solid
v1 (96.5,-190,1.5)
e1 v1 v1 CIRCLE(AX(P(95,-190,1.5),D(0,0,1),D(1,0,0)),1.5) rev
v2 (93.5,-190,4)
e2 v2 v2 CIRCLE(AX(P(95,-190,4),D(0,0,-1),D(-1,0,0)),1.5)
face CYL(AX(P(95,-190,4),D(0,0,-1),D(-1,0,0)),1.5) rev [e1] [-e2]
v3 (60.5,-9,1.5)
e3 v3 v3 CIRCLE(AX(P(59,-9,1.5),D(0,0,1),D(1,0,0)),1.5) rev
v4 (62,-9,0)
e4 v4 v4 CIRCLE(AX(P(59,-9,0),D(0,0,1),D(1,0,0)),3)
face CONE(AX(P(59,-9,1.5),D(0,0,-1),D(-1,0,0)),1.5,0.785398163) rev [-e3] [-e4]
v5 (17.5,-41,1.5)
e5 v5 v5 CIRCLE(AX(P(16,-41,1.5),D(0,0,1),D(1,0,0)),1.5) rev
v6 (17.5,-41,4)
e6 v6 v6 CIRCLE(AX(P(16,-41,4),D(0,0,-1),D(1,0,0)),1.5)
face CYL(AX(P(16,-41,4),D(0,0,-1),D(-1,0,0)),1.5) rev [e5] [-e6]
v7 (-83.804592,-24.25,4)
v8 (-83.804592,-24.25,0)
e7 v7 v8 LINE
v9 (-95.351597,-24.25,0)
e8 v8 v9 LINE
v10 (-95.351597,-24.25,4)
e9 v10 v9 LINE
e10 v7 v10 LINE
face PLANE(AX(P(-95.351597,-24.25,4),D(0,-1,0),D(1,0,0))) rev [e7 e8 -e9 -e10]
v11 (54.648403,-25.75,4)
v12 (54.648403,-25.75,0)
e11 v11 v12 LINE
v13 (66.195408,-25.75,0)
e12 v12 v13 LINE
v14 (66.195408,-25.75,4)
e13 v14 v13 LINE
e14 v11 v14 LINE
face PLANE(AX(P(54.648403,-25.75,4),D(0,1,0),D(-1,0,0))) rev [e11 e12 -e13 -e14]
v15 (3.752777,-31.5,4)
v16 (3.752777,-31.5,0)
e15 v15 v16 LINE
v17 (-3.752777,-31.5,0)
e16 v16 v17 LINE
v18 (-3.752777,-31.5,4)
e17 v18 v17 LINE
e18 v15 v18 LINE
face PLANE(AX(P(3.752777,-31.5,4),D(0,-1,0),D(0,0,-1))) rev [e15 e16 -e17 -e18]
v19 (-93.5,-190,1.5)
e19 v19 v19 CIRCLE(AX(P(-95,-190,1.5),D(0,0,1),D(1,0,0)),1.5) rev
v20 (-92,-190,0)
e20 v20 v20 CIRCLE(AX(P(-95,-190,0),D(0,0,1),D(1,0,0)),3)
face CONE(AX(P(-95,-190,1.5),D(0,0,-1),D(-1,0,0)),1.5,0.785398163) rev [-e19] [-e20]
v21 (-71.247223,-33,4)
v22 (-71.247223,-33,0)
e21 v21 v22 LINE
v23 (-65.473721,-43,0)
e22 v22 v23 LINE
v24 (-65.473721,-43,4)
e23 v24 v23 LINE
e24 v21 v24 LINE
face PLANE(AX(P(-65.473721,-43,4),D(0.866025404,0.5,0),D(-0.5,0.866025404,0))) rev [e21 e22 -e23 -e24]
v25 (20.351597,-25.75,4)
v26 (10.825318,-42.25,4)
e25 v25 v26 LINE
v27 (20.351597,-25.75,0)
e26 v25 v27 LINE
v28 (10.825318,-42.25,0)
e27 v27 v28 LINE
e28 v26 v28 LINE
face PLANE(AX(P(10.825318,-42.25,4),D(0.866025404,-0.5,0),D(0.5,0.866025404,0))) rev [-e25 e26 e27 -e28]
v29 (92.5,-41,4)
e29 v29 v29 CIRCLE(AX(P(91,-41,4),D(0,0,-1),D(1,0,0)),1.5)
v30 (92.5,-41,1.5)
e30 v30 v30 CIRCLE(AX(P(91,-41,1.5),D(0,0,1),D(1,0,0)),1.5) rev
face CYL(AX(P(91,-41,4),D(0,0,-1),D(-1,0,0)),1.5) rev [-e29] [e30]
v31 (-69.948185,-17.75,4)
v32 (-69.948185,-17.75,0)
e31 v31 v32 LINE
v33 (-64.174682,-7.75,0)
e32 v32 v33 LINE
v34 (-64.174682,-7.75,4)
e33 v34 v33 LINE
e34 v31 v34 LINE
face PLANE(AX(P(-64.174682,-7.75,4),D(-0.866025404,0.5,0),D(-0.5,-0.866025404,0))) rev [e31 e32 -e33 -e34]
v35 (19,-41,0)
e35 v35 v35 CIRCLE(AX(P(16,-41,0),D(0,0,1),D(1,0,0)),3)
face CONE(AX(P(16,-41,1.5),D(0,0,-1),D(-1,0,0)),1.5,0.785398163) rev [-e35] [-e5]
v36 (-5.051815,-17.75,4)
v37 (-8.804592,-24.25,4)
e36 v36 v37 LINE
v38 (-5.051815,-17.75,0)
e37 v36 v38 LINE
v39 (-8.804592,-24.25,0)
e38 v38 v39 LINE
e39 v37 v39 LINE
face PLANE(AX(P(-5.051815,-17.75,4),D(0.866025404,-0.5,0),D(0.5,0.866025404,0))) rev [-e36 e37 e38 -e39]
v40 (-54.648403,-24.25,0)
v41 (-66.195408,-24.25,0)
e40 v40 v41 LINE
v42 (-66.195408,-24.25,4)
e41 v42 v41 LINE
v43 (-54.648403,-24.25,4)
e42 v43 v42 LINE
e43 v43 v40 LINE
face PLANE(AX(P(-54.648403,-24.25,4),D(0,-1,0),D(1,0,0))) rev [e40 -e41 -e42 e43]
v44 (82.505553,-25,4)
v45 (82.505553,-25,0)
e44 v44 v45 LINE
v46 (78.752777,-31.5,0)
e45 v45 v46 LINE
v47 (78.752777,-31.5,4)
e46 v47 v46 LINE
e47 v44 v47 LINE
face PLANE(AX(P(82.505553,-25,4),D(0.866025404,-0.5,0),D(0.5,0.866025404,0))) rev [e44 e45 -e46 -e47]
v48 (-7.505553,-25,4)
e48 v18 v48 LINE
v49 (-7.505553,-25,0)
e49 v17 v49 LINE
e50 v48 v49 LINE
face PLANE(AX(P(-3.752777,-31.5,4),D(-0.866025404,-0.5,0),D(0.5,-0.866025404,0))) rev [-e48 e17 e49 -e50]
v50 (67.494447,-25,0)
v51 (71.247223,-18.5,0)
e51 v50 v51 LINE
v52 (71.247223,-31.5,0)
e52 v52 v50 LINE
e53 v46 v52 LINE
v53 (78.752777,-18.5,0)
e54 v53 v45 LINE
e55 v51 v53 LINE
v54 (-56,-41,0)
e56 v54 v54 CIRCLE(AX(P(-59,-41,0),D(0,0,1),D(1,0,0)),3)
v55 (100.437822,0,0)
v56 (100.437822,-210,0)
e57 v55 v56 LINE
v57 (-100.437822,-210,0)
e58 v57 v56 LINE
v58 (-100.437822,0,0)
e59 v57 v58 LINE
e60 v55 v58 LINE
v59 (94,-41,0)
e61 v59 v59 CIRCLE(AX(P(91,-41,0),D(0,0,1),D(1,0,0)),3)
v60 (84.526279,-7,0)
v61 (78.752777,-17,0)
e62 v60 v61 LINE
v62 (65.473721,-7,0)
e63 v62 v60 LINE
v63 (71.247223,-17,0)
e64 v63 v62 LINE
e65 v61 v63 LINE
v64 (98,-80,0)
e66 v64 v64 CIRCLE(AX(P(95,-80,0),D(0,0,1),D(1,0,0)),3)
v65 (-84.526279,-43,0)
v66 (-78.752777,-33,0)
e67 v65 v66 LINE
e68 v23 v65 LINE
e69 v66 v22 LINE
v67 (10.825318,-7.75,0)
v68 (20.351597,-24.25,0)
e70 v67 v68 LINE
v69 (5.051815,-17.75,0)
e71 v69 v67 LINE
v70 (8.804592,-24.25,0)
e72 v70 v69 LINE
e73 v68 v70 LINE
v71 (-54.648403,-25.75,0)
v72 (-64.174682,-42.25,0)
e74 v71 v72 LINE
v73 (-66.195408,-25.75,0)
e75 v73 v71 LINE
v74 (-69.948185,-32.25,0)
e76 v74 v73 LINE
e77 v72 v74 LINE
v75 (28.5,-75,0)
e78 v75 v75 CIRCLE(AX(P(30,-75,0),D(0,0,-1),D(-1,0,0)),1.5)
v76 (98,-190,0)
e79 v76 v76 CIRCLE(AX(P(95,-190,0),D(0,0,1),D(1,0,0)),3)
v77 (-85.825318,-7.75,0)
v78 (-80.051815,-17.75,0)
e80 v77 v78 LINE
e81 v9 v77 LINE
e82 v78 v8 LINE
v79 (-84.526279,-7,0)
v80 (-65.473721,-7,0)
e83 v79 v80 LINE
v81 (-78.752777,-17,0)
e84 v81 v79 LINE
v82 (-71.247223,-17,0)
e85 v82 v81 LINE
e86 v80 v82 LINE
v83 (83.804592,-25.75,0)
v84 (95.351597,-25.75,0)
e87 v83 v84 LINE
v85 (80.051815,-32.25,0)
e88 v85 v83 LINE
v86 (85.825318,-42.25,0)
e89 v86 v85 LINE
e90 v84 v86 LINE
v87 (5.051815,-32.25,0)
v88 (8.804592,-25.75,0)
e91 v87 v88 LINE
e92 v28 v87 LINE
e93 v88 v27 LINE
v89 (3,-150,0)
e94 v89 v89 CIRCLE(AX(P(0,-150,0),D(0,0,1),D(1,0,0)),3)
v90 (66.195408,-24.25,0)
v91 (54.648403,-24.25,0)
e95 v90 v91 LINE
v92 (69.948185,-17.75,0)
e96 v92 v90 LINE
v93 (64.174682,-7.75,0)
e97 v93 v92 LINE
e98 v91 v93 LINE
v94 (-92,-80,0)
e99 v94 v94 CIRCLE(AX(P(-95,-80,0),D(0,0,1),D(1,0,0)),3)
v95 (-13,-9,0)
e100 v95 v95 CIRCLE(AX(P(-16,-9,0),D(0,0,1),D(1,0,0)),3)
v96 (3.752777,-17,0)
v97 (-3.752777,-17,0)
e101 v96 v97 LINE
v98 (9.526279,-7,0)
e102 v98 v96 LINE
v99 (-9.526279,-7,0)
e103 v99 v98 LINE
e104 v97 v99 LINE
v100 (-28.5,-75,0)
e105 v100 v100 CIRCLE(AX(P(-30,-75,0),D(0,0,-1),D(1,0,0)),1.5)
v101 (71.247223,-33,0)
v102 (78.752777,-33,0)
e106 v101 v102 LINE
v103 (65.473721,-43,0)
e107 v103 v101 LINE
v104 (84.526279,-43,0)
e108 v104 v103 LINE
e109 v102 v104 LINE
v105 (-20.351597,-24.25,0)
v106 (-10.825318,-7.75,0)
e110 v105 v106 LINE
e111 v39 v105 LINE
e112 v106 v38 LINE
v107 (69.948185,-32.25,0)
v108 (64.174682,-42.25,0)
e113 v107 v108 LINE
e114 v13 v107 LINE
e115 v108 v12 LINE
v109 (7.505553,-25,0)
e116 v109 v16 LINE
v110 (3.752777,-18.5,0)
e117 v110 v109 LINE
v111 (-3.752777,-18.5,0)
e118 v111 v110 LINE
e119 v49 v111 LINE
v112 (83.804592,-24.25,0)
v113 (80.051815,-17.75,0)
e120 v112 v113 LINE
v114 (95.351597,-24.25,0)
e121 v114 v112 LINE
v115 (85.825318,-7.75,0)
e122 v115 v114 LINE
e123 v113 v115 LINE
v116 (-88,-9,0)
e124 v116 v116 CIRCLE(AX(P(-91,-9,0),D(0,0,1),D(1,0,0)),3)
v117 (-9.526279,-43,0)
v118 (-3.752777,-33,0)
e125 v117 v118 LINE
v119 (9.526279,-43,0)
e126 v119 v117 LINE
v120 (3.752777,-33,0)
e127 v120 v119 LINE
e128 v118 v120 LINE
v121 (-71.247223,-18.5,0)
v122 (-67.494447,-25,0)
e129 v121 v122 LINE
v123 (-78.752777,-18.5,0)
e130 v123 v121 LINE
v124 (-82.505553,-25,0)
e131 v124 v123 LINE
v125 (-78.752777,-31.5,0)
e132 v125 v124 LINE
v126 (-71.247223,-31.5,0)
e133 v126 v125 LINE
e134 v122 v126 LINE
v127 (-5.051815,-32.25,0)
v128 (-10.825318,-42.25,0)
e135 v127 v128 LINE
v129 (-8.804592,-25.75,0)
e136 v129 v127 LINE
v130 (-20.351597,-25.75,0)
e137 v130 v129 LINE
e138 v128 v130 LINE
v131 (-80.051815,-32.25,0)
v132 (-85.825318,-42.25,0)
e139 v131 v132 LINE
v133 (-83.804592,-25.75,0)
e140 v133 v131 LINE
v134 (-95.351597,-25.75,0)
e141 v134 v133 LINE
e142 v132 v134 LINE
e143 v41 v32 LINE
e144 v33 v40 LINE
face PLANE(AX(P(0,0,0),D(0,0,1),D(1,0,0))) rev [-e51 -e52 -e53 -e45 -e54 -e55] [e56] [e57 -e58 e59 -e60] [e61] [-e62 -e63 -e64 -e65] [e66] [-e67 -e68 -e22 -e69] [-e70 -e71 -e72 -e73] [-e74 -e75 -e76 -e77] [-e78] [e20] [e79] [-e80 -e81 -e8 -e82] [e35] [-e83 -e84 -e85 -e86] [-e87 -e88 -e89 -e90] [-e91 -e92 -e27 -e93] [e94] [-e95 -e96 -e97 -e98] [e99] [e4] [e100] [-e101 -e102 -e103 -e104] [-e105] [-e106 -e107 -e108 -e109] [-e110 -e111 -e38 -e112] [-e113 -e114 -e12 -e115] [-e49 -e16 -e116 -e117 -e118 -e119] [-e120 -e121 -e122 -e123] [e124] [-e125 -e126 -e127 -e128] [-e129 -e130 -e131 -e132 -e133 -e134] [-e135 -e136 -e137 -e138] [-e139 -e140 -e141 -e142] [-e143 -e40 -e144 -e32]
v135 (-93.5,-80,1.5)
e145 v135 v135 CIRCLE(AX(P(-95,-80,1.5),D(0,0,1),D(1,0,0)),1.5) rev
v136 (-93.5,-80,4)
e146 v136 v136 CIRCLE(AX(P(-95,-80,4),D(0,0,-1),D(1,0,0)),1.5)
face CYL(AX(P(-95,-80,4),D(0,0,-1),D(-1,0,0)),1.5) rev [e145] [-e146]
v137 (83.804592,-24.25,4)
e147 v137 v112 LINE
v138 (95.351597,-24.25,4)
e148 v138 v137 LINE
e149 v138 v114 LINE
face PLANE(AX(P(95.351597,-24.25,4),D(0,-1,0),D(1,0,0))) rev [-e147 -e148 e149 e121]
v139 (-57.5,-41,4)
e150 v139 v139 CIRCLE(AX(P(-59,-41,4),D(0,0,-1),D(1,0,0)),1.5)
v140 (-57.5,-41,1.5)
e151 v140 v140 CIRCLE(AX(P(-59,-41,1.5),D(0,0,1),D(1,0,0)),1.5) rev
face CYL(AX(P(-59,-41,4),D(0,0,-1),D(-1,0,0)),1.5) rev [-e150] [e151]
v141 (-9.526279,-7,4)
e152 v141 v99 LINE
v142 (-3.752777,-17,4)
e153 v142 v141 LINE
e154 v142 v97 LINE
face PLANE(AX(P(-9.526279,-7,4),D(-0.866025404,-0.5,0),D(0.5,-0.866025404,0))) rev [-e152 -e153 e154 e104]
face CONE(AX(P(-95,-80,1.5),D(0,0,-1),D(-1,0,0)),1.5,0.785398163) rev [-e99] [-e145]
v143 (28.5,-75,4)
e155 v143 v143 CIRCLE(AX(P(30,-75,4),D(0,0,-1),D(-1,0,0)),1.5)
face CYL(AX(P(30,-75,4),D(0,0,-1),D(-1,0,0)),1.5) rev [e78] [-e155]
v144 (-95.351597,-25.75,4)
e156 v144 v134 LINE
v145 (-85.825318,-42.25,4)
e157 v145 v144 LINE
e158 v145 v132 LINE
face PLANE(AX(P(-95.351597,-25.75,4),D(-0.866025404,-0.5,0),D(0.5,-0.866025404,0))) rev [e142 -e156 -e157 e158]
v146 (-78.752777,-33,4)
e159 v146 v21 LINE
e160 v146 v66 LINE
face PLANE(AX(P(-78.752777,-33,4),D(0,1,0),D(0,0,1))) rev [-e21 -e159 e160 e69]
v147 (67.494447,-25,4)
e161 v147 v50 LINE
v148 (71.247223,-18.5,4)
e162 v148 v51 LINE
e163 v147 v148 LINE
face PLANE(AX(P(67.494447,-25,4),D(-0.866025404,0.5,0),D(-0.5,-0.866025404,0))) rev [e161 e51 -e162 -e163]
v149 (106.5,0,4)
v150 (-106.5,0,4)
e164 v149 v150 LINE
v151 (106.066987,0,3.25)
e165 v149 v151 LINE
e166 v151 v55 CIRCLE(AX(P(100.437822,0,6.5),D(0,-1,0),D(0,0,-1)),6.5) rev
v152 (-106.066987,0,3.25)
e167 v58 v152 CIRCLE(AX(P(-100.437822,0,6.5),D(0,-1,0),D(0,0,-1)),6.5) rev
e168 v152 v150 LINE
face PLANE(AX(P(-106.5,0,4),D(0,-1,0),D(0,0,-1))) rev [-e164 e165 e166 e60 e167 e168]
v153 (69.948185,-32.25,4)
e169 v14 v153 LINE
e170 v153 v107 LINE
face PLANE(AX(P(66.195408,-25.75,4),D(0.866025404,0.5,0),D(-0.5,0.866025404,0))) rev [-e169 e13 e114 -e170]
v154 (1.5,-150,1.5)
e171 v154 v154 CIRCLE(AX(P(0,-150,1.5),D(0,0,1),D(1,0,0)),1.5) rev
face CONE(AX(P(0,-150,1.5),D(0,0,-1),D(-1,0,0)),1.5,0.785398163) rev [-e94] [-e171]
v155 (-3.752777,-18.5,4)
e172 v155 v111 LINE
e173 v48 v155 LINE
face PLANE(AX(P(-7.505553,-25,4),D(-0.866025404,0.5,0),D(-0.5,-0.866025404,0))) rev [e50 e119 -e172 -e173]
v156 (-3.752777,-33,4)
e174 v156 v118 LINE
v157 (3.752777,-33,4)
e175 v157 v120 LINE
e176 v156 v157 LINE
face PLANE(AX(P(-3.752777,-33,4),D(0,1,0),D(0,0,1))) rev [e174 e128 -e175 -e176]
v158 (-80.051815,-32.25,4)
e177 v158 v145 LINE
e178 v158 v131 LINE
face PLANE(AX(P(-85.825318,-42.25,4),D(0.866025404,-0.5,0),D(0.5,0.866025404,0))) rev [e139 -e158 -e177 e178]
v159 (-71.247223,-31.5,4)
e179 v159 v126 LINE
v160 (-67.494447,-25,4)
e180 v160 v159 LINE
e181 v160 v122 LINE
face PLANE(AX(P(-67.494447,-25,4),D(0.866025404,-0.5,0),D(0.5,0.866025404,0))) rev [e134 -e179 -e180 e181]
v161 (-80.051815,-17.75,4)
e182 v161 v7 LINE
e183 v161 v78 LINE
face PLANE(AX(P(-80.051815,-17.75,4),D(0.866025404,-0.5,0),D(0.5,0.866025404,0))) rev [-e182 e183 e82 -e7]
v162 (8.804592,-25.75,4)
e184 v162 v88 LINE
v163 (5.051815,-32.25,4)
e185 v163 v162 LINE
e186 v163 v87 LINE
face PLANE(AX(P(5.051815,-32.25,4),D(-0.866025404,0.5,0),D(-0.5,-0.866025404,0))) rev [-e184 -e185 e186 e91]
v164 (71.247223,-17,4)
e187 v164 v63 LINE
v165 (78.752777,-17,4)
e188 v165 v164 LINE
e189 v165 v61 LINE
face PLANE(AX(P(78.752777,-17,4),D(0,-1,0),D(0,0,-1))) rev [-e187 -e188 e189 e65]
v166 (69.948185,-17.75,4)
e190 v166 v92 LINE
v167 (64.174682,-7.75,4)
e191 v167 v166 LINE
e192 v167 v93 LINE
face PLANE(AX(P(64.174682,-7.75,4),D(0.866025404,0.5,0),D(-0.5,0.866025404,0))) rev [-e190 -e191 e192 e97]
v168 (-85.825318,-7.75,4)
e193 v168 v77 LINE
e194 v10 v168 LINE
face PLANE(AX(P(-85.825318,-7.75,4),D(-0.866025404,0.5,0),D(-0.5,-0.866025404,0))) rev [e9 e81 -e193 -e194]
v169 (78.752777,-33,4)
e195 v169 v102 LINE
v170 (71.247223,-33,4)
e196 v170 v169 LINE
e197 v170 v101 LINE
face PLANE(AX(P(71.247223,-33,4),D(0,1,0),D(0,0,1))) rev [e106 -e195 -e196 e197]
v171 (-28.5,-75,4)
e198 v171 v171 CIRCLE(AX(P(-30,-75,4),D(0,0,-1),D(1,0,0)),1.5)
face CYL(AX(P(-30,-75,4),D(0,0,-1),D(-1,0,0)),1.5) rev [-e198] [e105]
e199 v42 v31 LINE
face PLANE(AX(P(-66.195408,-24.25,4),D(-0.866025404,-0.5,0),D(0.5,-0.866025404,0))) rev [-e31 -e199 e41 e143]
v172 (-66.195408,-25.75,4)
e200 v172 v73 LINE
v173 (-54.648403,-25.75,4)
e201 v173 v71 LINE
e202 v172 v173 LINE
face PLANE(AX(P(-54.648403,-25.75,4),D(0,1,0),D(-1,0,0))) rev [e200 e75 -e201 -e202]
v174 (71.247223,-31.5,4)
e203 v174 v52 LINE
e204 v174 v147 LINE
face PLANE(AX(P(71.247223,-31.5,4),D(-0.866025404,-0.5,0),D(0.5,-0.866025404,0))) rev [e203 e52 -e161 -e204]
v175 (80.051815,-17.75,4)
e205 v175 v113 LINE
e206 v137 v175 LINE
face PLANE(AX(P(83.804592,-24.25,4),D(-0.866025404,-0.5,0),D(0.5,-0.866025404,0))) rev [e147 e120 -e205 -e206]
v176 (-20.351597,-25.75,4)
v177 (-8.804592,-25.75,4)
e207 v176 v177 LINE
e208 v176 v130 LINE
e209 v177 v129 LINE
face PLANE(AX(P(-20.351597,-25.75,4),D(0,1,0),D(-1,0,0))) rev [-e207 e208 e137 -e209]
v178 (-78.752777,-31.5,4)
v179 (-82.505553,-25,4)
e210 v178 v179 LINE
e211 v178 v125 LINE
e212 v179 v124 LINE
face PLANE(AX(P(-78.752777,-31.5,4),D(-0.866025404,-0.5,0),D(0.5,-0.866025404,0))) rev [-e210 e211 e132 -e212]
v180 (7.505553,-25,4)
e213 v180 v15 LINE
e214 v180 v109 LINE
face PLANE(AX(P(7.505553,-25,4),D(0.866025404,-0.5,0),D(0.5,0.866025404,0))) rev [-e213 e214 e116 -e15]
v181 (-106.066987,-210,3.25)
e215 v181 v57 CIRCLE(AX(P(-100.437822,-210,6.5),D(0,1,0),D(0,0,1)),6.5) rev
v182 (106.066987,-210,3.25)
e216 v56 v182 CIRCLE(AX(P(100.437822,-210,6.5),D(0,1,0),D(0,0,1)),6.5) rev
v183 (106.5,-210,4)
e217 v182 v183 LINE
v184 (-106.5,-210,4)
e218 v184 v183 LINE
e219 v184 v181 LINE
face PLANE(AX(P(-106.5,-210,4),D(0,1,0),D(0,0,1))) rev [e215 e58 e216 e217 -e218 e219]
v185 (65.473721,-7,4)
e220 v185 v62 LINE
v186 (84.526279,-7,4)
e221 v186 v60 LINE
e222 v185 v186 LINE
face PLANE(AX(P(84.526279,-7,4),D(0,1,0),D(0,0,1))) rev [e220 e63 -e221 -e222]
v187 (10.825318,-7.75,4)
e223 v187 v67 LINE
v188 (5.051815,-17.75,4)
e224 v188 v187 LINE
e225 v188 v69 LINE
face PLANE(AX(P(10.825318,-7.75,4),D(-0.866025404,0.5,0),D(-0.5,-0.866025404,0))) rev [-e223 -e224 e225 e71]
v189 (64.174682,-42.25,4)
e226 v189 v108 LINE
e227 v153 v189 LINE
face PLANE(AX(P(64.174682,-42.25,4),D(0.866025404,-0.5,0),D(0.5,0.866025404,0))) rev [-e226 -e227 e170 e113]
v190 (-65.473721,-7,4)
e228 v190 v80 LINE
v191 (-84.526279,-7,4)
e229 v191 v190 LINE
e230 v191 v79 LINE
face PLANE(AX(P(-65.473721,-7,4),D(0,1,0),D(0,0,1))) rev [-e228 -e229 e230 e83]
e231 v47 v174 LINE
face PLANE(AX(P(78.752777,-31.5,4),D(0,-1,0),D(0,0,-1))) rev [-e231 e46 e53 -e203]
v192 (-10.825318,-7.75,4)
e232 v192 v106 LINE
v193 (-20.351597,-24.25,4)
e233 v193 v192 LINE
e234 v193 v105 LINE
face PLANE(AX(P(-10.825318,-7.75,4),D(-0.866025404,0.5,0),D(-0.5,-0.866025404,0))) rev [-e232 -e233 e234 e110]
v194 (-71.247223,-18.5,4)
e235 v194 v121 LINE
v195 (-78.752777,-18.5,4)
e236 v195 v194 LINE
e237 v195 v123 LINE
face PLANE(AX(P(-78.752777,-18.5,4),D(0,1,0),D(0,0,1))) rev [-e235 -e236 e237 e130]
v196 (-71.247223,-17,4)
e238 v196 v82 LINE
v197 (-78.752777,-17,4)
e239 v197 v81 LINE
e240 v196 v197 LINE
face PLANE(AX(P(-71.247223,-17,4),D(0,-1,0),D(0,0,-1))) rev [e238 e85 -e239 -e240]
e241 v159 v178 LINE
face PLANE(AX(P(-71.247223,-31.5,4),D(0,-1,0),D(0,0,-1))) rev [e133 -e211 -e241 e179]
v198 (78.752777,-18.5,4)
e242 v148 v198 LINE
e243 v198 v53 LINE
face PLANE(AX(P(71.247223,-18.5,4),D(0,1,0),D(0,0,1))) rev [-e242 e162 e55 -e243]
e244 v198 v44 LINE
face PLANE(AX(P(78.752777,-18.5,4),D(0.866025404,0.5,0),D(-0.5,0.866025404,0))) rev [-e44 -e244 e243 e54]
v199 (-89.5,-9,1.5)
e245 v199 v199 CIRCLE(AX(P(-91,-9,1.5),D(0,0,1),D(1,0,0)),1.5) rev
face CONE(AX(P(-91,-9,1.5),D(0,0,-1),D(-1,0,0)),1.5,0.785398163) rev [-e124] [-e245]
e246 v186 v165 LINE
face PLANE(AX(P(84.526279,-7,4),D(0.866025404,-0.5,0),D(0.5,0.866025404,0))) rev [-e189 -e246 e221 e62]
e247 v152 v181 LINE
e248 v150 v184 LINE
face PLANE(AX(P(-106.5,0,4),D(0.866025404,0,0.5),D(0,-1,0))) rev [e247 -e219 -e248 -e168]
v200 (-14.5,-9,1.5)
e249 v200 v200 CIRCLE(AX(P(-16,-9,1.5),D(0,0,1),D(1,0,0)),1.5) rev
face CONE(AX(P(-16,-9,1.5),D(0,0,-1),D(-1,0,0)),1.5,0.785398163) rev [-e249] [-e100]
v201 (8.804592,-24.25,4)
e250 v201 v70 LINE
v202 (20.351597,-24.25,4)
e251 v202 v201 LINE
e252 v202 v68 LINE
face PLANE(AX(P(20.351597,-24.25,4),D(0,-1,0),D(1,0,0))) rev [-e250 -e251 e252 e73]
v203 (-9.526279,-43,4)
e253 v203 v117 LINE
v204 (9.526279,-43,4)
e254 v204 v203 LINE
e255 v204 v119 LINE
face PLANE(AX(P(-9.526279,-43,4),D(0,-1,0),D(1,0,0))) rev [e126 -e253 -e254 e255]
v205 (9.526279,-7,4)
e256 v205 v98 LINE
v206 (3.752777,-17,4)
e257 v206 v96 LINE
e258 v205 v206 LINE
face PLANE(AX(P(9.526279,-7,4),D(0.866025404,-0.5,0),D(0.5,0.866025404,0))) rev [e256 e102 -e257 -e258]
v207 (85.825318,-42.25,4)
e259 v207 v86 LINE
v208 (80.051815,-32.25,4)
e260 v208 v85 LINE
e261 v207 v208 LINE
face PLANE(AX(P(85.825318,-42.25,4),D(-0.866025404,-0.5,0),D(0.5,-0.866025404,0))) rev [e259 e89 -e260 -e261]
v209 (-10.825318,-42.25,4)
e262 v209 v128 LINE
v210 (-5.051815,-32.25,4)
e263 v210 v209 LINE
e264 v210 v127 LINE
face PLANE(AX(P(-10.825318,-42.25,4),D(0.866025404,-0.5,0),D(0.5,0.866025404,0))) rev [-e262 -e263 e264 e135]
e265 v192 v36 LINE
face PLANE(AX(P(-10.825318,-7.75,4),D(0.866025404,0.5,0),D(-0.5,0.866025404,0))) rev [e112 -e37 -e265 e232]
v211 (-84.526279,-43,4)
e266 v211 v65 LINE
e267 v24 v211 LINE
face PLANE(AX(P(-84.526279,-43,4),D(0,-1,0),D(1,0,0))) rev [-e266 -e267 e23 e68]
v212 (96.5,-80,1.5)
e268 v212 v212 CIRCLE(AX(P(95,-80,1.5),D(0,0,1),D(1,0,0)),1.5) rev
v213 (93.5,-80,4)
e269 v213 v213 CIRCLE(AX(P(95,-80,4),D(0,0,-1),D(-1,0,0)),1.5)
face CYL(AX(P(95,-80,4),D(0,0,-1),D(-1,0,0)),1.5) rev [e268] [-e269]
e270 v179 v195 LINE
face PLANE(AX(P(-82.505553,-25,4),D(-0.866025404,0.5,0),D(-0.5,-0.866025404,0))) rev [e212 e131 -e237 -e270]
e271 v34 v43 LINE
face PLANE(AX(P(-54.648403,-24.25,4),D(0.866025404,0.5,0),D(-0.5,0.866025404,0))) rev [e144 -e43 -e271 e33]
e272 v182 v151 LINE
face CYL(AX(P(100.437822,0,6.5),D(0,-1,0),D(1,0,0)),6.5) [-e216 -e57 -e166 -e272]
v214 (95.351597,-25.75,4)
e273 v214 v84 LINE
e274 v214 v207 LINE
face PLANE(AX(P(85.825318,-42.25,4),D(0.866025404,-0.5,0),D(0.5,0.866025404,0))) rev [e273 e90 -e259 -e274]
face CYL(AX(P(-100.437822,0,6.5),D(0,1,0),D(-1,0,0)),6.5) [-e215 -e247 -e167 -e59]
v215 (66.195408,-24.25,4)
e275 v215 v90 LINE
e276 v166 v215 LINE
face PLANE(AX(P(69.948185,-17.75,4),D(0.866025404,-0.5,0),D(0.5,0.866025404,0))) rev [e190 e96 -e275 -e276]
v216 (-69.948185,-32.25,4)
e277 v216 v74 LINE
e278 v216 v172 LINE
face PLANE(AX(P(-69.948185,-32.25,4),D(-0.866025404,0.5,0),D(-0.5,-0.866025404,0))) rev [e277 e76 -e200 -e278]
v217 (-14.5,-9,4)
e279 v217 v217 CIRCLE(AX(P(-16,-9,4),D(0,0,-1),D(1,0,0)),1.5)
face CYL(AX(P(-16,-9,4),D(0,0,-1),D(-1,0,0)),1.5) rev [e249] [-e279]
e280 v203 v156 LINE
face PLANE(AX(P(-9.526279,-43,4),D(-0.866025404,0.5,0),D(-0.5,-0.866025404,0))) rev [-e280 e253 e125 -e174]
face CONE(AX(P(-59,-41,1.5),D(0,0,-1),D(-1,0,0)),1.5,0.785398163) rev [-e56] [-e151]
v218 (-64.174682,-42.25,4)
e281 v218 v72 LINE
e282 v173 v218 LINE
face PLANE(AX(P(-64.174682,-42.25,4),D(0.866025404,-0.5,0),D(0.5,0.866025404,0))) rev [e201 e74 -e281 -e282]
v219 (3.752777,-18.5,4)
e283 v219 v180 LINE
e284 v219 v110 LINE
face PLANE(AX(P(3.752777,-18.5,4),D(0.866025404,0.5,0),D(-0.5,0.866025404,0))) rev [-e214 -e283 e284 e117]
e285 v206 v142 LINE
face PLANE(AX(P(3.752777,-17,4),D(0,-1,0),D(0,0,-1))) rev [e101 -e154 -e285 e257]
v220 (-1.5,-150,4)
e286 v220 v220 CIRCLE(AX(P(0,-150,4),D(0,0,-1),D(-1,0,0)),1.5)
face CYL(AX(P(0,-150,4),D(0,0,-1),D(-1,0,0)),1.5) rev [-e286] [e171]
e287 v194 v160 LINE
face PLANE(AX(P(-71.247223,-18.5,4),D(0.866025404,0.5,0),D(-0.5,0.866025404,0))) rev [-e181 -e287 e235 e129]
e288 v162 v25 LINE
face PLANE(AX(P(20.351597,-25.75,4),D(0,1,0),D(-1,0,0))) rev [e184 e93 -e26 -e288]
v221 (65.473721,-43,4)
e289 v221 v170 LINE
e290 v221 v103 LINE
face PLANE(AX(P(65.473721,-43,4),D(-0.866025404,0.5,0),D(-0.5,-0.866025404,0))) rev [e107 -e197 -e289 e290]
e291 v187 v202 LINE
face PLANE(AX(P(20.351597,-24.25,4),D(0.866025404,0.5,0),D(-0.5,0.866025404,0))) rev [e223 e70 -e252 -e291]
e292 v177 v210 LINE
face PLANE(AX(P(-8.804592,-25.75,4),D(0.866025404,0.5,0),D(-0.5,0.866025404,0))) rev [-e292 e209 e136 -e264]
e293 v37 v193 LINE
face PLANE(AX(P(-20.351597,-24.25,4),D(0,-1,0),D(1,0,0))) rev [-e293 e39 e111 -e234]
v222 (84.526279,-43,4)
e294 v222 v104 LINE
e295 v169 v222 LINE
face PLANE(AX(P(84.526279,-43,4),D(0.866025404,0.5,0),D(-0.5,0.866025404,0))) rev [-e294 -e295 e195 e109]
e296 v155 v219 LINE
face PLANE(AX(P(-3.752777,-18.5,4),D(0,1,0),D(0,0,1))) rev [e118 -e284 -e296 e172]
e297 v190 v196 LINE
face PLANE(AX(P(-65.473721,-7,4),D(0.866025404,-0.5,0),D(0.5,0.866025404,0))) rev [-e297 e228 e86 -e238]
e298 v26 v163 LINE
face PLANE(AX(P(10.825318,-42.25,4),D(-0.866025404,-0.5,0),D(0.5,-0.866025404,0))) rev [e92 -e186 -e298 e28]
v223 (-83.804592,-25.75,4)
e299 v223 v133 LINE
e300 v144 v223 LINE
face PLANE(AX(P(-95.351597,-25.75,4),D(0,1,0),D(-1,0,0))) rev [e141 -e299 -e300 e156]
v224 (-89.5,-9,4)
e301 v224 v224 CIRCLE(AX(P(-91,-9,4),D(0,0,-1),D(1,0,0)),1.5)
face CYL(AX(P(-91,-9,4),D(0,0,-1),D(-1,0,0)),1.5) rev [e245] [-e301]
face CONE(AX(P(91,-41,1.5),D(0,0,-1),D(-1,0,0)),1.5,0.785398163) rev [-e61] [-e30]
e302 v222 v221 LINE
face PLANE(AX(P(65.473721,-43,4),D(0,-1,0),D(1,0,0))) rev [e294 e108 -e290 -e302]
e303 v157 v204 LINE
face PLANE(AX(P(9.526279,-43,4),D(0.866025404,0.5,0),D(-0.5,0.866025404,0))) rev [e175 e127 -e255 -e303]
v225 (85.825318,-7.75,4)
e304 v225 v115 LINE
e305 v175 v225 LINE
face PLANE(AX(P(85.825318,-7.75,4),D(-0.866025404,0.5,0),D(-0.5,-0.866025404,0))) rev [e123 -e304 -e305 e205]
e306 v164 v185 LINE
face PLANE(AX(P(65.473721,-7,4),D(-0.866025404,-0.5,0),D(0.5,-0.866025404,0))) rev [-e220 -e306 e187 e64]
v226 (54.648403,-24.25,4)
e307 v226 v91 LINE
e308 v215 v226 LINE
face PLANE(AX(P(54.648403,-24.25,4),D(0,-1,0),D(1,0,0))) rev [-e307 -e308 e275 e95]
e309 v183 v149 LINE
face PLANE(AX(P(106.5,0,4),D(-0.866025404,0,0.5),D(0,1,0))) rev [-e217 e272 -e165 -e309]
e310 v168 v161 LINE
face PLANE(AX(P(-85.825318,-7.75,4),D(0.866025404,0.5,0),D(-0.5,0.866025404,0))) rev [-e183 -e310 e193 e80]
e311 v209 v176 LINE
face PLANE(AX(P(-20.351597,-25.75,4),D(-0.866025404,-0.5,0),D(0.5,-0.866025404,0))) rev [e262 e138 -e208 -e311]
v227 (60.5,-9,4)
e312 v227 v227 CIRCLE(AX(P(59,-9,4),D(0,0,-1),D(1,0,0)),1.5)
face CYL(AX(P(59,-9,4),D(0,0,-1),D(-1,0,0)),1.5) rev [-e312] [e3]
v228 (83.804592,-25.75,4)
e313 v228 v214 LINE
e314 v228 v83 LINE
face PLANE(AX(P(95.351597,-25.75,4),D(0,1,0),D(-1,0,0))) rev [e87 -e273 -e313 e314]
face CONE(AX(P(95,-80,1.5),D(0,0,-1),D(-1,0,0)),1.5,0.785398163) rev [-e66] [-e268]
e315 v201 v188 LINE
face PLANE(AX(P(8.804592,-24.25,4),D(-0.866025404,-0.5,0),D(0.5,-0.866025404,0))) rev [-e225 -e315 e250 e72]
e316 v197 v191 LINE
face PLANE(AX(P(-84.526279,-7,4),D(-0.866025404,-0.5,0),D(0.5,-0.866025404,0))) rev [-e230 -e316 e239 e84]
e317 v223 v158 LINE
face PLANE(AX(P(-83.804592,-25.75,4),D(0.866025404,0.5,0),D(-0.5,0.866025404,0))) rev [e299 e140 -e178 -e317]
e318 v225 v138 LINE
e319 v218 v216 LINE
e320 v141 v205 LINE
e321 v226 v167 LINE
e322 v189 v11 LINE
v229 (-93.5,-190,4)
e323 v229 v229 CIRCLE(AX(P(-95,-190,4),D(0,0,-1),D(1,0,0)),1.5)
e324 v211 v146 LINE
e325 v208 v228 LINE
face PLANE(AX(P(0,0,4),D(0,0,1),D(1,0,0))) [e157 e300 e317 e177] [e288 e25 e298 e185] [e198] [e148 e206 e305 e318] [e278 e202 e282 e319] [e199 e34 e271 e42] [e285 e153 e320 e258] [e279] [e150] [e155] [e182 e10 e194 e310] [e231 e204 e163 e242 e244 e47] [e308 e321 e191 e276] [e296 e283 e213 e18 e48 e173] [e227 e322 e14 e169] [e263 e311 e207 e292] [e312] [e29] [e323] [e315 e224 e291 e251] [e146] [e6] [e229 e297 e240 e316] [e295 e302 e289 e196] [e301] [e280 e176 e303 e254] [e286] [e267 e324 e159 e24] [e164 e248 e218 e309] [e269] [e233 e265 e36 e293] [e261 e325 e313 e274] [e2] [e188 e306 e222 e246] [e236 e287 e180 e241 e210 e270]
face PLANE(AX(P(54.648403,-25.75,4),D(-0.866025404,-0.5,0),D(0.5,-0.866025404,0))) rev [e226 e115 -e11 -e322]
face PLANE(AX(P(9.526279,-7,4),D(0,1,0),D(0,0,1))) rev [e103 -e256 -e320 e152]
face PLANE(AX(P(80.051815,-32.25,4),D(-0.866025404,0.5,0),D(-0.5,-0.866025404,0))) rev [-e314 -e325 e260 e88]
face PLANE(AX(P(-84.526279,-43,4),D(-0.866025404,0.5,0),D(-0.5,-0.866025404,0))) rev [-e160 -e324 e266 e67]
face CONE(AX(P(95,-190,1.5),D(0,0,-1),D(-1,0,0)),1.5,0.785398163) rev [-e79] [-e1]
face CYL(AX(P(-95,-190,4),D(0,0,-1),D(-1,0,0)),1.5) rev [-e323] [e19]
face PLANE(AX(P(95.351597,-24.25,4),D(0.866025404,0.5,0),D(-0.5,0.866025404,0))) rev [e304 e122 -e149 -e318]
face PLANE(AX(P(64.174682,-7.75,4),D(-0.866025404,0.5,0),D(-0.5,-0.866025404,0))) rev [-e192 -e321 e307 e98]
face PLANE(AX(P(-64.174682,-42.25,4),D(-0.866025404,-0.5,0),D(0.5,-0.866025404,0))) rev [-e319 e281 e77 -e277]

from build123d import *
from OCP.BRepFilletAPI import BRepFilletAPI_MakeChamfer

# Parameters (mm, degrees)
ESQUISSE1_W                = 213
ESQUISSE1_H                = 210
BOSS_EXTRU_1_DEPTH         = 4
CHANFREIN1_SIZE            = 4
CHANFREIN1_SIZE_2          = 2.309401077
CONG_1_R                   = 6.5
ESQUISSE2_R                = 1.5
ENL_V_MAT_EXTRU_1_DEPTH    = 236.495753677
ESQUISSE3_R                = 1.5
ENL_V_MAT_EXTRU_2_DEPTH    = 236.495753677
R_P_TITION_LIN_AIRE1_COUNT = 3
R_P_TITION_LIN_AIRE1_PITCH = 75
CHANFREIN2_SIZE            = 1.5


with BuildPart() as part:
    # Esquisse1 → Boss.-Extru.1 (new body)
    with BuildSketch(Plane.XY):
        with Locations((0, -105)):
            Rectangle(ESQUISSE1_W, ESQUISSE1_H)
    extrude(amount=BOSS_EXTRU_1_DEPTH)

    # Chanfrein1
    chanfrein1_edges_1 = [part.edges().sort_by_distance(p)[0] for p in [
        (-106.5, -105, 0),
    ]]
    chanfrein1_side_1 = [part.faces().sort_by_distance(p)[0] for p in [
        (-106.5, -105, 0.046188022),
    ]]
    chanfrein1_edges_2 = [part.edges().sort_by_distance(p)[0] for p in [
        (106.5, -105, 0),
    ]]
    chanfrein1_side_2 = [part.faces().sort_by_distance(p)[0] for p in [
        (106.5, -105, 0.046188022),
    ]]
    chanfrein1 = BRepFilletAPI_MakeChamfer(part.part.solid().wrapped)
    for e in chanfrein1_edges_1:
        chanfrein1.Add(CHANFREIN1_SIZE - 0.0001, CHANFREIN1_SIZE_2 - 0.0001, e.wrapped, chanfrein1_side_1[0].wrapped)
    for e in chanfrein1_edges_2:
        chanfrein1.Add(CHANFREIN1_SIZE - 0.0001, CHANFREIN1_SIZE_2 - 0.0001, e.wrapped, chanfrein1_side_2[0].wrapped)
    add(Compound.cast(chanfrein1.Shape()), mode=Mode.REPLACE)  # a hair under: the kernel refuses the full size

    # Congé1
    cong_1_edges = [part.edges().sort_by_distance(p)[0] for p in [
        (104.190698923, -105, 0),
        (-104.190698923, -105, 0),
    ]]
    fillet(cong_1_edges, radius=CONG_1_R)

    # Esquisse2 → Enlèv. mat.-Extru.1 (cut, through all)
    with BuildSketch(Plane(origin=(0, 0, 0), x_dir=(-1, 0, 0), z_dir=(0, 0, -1))):
        with Locations((-30, -75)):
            Circle(ESQUISSE2_R)
        with Locations((-95, -80)):
            Circle(ESQUISSE2_R)
        with Locations((-95, -190)):
            Circle(ESQUISSE2_R)
        with Locations(Location((95, -190, 0), (0, 0, 180))):
            Circle(ESQUISSE2_R)
        with Locations(Location((95, -80, 0), (0, 0, 180))):
            Circle(ESQUISSE2_R)
        with Locations(Location((30, -75, 0), (0, 0, 180))):
            Circle(ESQUISSE2_R)
        with Locations((0, -150)):
            Circle(ESQUISSE2_R)
    extrude(amount=-ENL_V_MAT_EXTRU_1_DEPTH, mode=Mode.SUBTRACT)

    # Esquisse3 → Enlèv. mat.-Extru.2 (cut, through all)
    with BuildSketch(Plane(origin=(0, 0, 0), x_dir=(-1, 0, 0), z_dir=(0, 0, -1))):
        with Locations(Location((-91, -41, 0), (0, 0, 180))):
            Circle(ESQUISSE3_R)
        with Locations(Location((-59, -9, 0), (0, 0, 180))):
            Circle(ESQUISSE3_R)
        Polygon((-67.494446501, -25), (-71.24722325, -18.5), (-78.75277675, -18.5), (-82.505553499, -25), (-78.75277675, -31.5), (-71.24722325, -31.5), align=None)
        Polygon((-84.526279442, -7), (-65.473720558, -7), (-71.24722325, -17), (-78.75277675, -17), align=None)
        Polygon((-64.174682453, -7.75), (-54.648403011, -24.25), (-66.195408395, -24.25), (-69.948185145, -17.75), align=None)
        Polygon((-54.648403011, -25.75), (-64.174682453, -42.25), (-69.948185145, -32.25), (-66.195408395, -25.75), align=None)
        Polygon((-65.473720558, -43), (-84.526279442, -43), (-78.75277675, -33), (-71.24722325, -33), align=None)
        Polygon((-85.825317547, -42.25), (-95.351596989, -25.75), (-83.804591605, -25.75), (-80.051814855, -32.25), align=None)
        Polygon((-95.351596989, -24.25), (-85.825317547, -7.75), (-80.051814855, -17.75), (-83.804591605, -24.25), align=None)
    enl_v_mat_extru_2 = extrude(amount=-ENL_V_MAT_EXTRU_2_DEPTH, mode=Mode.SUBTRACT)

    # Répétition linéaire1: Enlèv. mat.-Extru.2 ×3
    with Locations(*[(-i * R_P_TITION_LIN_AIRE1_PITCH, 0, 0) for i in range(1, R_P_TITION_LIN_AIRE1_COUNT)]):
        add(enl_v_mat_extru_2, mode=Mode.SUBTRACT)

    # Chanfrein2
    chanfrein2_edges = [part.edges().sort_by_distance(p)[0] for p in [
        (14.5, -41, 0),
        (-60.5, -41, 0),
        (-17.5, -9, 0),
        (-92.5, -9, 0),
        (96.5, -80, 0),
        (96.5, -190, 0),
        (-96.5, -190, 0),
        (-96.5, -80, 0),
        (1.5, -150, 0),
        (89.5, -41, 0),
        (57.5, -9, 0),
    ]]
    chamfer(chanfrein2_edges, length=CHANFREIN2_SIZE)


solid = part.part
